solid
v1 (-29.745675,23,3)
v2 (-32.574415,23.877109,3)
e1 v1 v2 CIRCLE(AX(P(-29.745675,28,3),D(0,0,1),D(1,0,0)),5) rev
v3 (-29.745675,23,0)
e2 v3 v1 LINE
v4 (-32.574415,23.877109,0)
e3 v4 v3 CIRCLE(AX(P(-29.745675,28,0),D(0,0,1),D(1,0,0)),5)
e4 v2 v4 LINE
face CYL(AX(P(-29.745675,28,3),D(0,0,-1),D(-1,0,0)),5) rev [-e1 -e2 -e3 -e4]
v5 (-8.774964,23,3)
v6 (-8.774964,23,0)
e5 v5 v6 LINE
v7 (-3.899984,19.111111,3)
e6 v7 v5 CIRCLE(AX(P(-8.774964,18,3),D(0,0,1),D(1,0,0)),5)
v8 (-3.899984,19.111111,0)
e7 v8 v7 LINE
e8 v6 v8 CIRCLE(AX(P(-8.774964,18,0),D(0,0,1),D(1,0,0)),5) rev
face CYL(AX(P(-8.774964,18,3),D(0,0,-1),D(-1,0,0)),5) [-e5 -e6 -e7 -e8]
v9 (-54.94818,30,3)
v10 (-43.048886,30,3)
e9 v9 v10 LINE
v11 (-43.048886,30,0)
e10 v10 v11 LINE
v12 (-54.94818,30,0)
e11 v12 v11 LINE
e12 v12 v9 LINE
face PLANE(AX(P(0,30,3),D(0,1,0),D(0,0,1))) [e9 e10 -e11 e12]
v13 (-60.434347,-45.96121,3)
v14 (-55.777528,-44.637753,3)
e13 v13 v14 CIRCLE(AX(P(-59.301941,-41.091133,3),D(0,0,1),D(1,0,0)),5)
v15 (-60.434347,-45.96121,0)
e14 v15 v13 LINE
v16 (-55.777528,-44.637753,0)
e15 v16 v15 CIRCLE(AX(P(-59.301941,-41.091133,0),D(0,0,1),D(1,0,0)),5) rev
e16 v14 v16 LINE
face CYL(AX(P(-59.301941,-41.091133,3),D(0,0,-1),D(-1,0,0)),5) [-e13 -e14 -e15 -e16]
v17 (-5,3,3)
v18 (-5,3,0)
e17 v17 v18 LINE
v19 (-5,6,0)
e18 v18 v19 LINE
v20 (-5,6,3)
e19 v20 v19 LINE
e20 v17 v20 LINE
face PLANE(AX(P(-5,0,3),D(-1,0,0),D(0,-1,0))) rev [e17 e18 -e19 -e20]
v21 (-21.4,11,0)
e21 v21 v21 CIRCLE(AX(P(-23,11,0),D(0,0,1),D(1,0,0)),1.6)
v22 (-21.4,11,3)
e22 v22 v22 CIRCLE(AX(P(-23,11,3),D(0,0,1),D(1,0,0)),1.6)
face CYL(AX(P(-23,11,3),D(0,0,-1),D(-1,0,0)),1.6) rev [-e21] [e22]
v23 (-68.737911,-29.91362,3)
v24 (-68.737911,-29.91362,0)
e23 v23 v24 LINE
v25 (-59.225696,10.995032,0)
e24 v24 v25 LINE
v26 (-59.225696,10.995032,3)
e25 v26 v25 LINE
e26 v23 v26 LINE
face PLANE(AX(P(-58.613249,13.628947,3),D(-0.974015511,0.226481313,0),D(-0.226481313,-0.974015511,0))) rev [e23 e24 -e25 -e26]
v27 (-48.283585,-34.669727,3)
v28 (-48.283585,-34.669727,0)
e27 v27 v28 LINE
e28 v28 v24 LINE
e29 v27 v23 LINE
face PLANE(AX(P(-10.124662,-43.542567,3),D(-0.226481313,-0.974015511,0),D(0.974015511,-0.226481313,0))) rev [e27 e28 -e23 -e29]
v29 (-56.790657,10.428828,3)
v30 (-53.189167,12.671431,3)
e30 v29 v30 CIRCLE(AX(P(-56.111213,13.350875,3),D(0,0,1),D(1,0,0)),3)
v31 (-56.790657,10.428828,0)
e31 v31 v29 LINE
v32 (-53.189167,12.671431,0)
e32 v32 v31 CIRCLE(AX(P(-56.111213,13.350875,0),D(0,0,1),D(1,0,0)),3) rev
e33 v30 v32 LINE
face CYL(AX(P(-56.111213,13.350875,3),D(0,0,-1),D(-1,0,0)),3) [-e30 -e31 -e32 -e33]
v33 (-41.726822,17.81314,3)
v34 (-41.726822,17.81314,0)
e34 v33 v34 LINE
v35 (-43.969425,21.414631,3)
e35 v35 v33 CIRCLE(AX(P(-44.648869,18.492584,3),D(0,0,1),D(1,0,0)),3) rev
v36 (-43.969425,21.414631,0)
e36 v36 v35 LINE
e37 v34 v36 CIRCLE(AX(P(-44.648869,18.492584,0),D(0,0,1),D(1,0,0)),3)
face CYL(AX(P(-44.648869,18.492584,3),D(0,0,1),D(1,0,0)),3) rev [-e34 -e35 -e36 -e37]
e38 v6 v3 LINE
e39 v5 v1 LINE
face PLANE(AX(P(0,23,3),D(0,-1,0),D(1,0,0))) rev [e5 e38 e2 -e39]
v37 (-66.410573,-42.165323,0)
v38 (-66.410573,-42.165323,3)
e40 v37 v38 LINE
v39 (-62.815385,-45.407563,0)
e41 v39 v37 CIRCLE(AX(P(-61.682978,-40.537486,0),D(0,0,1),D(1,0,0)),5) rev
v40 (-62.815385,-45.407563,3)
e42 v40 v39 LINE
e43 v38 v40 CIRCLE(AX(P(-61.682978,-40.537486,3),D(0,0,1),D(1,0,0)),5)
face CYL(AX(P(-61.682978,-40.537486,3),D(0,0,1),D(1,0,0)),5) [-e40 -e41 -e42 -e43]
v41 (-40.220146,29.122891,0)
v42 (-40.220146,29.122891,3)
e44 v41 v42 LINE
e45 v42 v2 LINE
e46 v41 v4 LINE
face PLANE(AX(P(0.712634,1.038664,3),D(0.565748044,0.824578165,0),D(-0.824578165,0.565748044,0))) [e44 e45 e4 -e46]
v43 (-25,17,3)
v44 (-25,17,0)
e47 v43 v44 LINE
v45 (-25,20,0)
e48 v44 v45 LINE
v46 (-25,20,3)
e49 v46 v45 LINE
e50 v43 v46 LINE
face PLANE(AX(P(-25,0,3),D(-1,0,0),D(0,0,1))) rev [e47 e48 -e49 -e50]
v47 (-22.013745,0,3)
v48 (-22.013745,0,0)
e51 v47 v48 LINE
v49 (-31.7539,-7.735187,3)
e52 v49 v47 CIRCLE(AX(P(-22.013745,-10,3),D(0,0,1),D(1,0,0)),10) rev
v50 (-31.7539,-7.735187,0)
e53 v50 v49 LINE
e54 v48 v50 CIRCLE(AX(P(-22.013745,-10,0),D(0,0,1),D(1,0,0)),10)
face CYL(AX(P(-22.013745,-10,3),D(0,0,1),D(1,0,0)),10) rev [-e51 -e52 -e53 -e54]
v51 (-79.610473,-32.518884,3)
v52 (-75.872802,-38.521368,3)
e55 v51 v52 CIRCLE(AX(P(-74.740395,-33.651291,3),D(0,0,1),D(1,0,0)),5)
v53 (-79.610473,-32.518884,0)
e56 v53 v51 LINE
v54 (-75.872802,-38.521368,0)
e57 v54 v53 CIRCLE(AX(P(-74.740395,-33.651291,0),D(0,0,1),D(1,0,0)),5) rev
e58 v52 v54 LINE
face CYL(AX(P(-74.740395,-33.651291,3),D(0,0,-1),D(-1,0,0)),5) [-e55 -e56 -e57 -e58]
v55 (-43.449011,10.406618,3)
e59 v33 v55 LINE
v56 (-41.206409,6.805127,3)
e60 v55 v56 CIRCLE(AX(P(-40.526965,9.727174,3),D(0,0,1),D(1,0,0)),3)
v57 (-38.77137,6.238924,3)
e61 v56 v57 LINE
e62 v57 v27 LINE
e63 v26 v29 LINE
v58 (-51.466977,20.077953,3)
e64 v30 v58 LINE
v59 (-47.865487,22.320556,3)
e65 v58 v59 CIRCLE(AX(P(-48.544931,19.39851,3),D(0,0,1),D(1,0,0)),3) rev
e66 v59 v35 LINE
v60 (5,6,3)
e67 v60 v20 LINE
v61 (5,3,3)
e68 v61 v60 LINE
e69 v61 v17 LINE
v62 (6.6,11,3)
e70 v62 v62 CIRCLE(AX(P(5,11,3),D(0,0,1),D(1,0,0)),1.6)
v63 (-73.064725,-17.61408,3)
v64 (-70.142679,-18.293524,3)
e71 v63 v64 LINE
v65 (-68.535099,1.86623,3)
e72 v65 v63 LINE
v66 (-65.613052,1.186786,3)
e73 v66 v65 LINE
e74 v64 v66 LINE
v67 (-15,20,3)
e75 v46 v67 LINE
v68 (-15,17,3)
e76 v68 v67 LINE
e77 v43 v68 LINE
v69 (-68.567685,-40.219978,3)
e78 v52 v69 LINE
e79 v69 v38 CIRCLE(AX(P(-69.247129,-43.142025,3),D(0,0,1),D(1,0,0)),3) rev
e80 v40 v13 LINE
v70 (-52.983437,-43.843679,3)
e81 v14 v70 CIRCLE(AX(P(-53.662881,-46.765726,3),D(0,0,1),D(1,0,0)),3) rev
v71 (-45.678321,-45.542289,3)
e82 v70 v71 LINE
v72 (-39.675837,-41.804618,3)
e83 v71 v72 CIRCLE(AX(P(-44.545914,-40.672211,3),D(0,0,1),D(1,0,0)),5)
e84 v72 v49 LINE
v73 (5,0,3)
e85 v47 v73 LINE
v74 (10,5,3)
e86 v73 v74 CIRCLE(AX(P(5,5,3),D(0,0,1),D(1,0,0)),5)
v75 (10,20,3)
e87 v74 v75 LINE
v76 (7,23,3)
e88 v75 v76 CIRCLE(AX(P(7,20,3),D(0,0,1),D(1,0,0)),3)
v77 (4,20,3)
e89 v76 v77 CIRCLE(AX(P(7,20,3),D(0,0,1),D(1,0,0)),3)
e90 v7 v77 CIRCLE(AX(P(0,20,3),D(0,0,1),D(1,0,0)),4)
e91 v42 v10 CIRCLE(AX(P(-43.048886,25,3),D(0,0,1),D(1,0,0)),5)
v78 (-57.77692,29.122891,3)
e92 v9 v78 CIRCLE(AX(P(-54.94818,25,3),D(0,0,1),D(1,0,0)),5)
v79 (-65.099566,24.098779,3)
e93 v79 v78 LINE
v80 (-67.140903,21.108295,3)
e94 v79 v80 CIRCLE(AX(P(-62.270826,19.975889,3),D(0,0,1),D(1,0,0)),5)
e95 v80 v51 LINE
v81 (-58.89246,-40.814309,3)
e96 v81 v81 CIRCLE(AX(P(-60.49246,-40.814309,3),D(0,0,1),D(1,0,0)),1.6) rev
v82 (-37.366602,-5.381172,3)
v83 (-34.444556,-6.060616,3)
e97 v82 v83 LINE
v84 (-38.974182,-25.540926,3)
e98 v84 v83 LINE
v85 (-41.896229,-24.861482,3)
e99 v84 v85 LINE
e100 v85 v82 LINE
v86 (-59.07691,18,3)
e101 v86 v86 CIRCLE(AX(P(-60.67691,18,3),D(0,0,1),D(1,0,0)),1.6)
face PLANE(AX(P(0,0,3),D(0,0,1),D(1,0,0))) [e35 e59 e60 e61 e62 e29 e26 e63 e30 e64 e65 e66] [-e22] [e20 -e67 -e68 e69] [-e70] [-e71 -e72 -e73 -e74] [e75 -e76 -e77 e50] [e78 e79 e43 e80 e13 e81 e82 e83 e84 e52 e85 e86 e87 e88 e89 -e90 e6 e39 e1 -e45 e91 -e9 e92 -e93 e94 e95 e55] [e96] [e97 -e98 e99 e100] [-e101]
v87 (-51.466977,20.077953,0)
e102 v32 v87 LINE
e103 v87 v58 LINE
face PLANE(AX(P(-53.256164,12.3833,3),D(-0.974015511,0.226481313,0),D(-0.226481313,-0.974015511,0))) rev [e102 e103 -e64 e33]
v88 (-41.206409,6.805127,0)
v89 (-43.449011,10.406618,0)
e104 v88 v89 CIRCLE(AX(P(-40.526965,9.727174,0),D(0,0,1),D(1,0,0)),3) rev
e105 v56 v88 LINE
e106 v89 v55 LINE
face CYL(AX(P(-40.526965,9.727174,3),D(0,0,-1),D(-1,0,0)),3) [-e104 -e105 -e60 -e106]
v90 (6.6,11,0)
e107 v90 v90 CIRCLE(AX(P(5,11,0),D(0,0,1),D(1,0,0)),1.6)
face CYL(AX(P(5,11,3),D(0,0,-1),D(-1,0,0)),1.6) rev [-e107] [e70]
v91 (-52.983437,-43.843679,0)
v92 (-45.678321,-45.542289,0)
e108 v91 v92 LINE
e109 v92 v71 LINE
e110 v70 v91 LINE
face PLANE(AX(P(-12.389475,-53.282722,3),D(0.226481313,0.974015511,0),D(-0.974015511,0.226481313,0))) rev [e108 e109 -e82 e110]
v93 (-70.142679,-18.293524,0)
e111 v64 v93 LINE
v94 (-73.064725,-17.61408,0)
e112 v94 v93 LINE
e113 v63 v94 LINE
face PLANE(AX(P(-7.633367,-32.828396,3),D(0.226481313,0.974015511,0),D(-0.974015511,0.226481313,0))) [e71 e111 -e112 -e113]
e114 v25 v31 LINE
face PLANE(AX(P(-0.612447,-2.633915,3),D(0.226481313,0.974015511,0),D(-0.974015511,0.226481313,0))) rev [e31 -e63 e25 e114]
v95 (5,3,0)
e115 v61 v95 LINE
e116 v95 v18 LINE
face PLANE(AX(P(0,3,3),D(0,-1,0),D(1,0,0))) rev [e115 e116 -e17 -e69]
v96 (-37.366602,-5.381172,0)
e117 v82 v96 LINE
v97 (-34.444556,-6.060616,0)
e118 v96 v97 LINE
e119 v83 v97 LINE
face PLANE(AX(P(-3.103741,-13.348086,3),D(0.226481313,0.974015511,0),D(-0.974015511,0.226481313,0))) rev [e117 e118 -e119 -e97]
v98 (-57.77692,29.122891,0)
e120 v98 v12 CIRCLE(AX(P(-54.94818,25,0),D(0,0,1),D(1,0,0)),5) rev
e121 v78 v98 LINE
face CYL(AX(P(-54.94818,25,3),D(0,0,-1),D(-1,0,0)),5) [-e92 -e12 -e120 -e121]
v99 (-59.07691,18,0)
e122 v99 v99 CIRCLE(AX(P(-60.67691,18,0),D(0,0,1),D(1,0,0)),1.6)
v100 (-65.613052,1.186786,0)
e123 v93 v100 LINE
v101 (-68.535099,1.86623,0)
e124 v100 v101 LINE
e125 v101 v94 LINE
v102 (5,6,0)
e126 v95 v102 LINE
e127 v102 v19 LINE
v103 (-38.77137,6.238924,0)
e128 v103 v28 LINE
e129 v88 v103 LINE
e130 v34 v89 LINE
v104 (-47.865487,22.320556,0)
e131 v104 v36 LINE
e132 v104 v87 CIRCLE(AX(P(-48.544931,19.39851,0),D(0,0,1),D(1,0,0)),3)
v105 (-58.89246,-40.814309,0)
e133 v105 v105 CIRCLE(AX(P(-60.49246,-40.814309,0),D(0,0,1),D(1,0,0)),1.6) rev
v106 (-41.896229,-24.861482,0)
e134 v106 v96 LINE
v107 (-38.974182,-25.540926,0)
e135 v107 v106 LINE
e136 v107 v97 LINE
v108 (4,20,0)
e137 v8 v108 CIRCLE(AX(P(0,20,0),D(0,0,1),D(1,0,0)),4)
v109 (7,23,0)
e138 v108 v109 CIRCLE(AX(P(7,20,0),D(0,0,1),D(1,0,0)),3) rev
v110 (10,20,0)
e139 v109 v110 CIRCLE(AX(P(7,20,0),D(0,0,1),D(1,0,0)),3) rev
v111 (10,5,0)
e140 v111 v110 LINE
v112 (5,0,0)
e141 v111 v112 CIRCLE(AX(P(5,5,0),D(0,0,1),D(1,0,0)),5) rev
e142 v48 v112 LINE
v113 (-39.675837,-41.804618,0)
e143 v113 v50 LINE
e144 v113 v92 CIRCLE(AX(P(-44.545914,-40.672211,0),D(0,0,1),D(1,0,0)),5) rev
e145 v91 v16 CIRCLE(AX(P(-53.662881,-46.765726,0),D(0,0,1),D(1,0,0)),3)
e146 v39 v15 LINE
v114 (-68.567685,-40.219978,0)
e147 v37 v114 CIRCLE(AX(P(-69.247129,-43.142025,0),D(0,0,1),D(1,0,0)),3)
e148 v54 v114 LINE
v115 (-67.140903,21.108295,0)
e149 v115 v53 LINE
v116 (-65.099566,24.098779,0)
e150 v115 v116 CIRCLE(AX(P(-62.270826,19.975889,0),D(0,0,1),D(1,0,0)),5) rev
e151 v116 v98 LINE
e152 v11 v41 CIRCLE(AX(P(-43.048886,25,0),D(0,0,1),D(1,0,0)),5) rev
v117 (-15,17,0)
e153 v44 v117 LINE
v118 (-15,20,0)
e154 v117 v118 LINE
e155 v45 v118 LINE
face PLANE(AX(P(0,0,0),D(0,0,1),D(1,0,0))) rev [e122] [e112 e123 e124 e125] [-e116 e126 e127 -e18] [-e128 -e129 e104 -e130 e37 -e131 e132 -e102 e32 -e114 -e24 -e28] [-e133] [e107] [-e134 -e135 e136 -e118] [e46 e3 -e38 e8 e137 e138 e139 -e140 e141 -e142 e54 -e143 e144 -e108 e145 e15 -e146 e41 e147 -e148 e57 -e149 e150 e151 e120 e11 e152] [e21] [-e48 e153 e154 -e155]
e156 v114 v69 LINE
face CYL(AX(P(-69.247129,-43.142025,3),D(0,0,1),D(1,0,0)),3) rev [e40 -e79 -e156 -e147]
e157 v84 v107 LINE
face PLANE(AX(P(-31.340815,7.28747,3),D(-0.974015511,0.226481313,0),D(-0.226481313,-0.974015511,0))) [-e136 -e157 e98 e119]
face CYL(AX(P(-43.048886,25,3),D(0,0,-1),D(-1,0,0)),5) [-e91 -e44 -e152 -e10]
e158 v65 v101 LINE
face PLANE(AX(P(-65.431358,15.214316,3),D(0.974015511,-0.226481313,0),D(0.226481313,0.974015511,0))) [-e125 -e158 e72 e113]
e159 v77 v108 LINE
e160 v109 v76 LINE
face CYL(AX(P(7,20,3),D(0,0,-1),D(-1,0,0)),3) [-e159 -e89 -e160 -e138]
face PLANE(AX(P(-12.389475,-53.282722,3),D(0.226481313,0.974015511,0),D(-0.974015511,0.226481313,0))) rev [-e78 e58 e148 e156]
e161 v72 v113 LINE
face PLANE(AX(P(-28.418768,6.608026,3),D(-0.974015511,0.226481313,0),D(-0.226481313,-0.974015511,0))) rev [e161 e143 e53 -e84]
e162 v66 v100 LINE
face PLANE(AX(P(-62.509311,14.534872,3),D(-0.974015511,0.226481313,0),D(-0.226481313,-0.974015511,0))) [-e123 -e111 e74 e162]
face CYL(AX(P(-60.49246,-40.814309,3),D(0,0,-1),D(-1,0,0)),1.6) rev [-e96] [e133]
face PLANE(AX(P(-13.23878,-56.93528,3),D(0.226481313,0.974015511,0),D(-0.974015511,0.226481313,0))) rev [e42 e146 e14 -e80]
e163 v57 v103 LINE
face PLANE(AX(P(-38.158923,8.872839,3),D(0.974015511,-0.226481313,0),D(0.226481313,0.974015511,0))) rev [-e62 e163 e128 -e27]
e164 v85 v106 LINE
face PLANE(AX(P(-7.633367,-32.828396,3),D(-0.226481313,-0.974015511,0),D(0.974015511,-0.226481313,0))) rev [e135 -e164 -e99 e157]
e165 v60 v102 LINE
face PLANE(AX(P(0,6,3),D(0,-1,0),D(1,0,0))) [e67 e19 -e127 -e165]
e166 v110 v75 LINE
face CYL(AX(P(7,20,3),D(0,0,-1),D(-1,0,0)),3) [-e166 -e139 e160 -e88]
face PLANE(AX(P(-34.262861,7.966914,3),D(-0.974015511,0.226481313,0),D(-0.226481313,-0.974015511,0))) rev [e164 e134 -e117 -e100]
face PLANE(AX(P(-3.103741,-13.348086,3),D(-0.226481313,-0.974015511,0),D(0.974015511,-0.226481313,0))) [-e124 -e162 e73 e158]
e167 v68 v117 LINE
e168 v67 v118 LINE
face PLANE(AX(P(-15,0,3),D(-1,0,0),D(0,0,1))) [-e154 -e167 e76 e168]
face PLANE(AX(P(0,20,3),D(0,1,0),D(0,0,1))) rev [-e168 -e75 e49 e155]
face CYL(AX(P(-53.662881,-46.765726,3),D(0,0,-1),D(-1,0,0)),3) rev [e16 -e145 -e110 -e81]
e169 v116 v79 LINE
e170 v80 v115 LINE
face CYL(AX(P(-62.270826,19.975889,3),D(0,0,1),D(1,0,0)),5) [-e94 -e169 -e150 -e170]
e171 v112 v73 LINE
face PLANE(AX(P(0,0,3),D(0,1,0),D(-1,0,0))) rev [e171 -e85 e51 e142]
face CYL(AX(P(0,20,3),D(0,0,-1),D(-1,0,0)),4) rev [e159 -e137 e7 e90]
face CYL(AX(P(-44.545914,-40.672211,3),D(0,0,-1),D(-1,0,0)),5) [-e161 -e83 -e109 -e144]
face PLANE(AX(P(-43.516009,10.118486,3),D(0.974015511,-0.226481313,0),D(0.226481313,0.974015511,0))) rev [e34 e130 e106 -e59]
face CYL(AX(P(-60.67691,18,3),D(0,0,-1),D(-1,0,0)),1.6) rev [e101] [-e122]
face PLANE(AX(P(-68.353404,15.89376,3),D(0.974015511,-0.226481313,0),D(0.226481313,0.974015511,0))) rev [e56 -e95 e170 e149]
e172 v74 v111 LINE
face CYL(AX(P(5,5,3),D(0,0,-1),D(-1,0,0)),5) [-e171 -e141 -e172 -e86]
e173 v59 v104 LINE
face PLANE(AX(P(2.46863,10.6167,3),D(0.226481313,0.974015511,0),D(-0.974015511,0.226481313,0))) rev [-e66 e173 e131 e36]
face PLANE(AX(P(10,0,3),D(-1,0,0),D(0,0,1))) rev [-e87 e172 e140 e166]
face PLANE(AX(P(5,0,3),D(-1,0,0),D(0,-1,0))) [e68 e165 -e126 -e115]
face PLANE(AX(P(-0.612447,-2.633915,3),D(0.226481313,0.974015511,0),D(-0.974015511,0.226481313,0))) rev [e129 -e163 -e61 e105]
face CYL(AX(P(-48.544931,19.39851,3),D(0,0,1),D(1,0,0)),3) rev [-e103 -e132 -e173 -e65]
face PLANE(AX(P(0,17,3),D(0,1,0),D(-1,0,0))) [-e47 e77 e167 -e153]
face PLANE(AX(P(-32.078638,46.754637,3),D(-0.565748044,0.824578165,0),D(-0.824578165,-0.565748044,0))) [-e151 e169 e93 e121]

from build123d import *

# Parameters (mm, degrees)
ESBO_O1_R                = 1.6000000000000096
ESBO_O1_R_2              = 1.5999999999999985
ESBO_O1_R_3              = 1.6000000000000019
ESBO_O1_R_4              = 1.6000000000000474
RESSALTO_EXTRUS_O1_DEPTH = 3
FILETE1_R                = 5
FILETE3_R                = 3
FILETE4_R                = 10
FILETE2_R                = 5


with BuildPart() as part:
    # Esboço1 → Ressalto-extrusão1 (new body)
    with BuildSketch(Plane.XY):
        with BuildLine():
            Line((-2.645751311064564, 23.000000000000014), (-31.296028057599443, 23.000000000000004))
            Line((-31.296028057599443, 22.999999999999996), (-41.49853289297047, 29.999999999999996))
            Line((-41.49853289297047, 29.999999999999996), (-56.49853289297047, 29.999999999999996))
            Line((-56.49853289297047, 29.999999999999996), (-66.7010377283415, 23.000000000000014))
            Line((-66.7010377283415, 23.000000000000014), (-80.74287914122172, -37.388961654722316))
            Line((-80.74287914122172, -37.388961654722316), (-65.64563872754113, -40.89942200794237))
            Line((-65.64563872754113, -40.89942200794238), (-66.49494365170727, -44.55198017254248))
            Line((-66.49494365170727, -44.55198017254248), (-56.754788546106894, -46.81679330365219))
            Line((-56.754788546106894, -46.81679330365219), (-55.90548362194077, -43.164235139052074))
            Line((-55.90548362194077, -43.164235139052074), (-40.80824320826024, -46.67469549227213))
            Line((-40.80824320826024, -46.67469549227213), (-29.955288394361567, 0))
            Line((-29.955288394361567, 0), (10, 0))
            Line((10.000000000000002, 0), (10.000000000000002, 23))
            Line((10.000000000000002, 23), (2.6457513110645188, 23.000000000000036))
            ThreePointArc((2.6457513110645325, 23.00000000000005), (2.416e-14, 16), (-2.645751311064569, 23.000000000000018))
        make_face()
        with Locations((-60.49245953335222, -40.81430918529715)):
            Circle(ESBO_O1_R, mode=Mode.SUBTRACT)
        Polygon((-34.44455590239048, -6.060615619977682), (-38.97418216460989, -25.54092583117841), (-41.89622869629002, -24.861481891845507), (-37.36660243407061, -5.381171680644762), align=None, mode=Mode.SUBTRACT)
        Polygon((-70.1426785025311, -18.293523811627356), (-73.06472503421121, -17.61407987229443), (-68.53509877199181, 1.8662303389063053), (-65.61305224031169, 1.1867863995733905), align=None, mode=Mode.SUBTRACT)
        Polygon((-53.86861044577067, 9.749384541179593), (-50.787533444320594, 22.999999999999996), (-41.04737833872022, 20.73518686889029), (-44.12845534017028, 7.484571410069881), (-38.771370032090054, 6.238924187959525), (-48.28358518275084, -34.669727255562044), (-68.73791090451164, -29.91361968023165), (-59.22569575385083, 10.995031763289926), align=None, mode=Mode.SUBTRACT)
        with Locations((-60.676910421506925, 17.999999999999996)):
            Circle(ESBO_O1_R_2, mode=Mode.SUBTRACT)
        Polygon((5.000000000000001, 6), (5, 3.0000000000000018), (-5, 2.9999999999999996), (-5.000000000000001, 5.999999999999999), align=None, mode=Mode.SUBTRACT)
        with Locations((-23.000000000000014, 10.999999999999996)):
            Circle(ESBO_O1_R_3, mode=Mode.SUBTRACT)
        Polygon((-14.999999999999993, 16.999999999999996), (-24.999999999999993, 16.999999999999993), (-24.999999999999993, 19.999999999999996), (-14.999999999999993, 19.999999999999996), align=None, mode=Mode.SUBTRACT)
        with Locations((5.000000000000001, 10.999999999999996)):
            Circle(ESBO_O1_R_4, mode=Mode.SUBTRACT)
    extrude(amount=RESSALTO_EXTRUS_O1_DEPTH)

    # Filete1
    filete1_edges = [part.edges().sort_by_distance(p)[0] for p in [
        (10, 0, 1.5),
        (-40.80824320826024, -46.67469549227213, 1.5),
        (-80.74287914122172, -37.388961654722316, 1.5),
    ]]
    fillet(filete1_edges, radius=FILETE1_R)

    # Filete3
    filete3_edges = [part.edges().sort_by_distance(p)[0] for p in [
        (-65.64563872754113, -40.89942200794238, 1.5),
        (-55.90548362194077, -43.164235139052074, 1.5),
        (2.6457513110645263, 23.000000000000043, 1.5),
        (10.000000000000002, 23, 1.5),
        (-50.787533444320594, 22.999999999999996, 1.5),
        (-41.04737833872022, 20.73518686889029, 1.5),
        (-44.12845534017028, 7.484571410069877, 1.5),
        (-53.86861044577067, 9.749384541179591, 1.5),
    ]]
    fillet(filete3_edges, radius=FILETE3_R - 0.0001)  # a hair under: the kernel refuses the full size

    # Filete4
    filete4_edges = [part.edges().sort_by_distance(p)[0] for p in [
        (-29.955288394361567, 0, 1.5),
    ]]
    fillet(filete4_edges, radius=FILETE4_R)

    # Filete2
    filete2_edges = [part.edges().sort_by_distance(p)[0] for p in [
        (-2.6457513110645667, 23.000000000000014, 1.5),
        (-56.754788546106894, -46.81679330365219, 1.5),
        (-66.49494365170727, -44.55198017254248, 1.5),
        (-31.296028057599443, 23, 1.5),
        (-41.49853289297047, 29.999999999999996, 1.5),
        (-56.49853289297047, 29.999999999999996, 1.5),
        (-66.7010377283415, 23.000000000000014, 1.5),
    ]]
    fillet(filete2_edges, radius=FILETE2_R - 0.0001)  # a hair under: the kernel refuses the full size


solid = part.part
